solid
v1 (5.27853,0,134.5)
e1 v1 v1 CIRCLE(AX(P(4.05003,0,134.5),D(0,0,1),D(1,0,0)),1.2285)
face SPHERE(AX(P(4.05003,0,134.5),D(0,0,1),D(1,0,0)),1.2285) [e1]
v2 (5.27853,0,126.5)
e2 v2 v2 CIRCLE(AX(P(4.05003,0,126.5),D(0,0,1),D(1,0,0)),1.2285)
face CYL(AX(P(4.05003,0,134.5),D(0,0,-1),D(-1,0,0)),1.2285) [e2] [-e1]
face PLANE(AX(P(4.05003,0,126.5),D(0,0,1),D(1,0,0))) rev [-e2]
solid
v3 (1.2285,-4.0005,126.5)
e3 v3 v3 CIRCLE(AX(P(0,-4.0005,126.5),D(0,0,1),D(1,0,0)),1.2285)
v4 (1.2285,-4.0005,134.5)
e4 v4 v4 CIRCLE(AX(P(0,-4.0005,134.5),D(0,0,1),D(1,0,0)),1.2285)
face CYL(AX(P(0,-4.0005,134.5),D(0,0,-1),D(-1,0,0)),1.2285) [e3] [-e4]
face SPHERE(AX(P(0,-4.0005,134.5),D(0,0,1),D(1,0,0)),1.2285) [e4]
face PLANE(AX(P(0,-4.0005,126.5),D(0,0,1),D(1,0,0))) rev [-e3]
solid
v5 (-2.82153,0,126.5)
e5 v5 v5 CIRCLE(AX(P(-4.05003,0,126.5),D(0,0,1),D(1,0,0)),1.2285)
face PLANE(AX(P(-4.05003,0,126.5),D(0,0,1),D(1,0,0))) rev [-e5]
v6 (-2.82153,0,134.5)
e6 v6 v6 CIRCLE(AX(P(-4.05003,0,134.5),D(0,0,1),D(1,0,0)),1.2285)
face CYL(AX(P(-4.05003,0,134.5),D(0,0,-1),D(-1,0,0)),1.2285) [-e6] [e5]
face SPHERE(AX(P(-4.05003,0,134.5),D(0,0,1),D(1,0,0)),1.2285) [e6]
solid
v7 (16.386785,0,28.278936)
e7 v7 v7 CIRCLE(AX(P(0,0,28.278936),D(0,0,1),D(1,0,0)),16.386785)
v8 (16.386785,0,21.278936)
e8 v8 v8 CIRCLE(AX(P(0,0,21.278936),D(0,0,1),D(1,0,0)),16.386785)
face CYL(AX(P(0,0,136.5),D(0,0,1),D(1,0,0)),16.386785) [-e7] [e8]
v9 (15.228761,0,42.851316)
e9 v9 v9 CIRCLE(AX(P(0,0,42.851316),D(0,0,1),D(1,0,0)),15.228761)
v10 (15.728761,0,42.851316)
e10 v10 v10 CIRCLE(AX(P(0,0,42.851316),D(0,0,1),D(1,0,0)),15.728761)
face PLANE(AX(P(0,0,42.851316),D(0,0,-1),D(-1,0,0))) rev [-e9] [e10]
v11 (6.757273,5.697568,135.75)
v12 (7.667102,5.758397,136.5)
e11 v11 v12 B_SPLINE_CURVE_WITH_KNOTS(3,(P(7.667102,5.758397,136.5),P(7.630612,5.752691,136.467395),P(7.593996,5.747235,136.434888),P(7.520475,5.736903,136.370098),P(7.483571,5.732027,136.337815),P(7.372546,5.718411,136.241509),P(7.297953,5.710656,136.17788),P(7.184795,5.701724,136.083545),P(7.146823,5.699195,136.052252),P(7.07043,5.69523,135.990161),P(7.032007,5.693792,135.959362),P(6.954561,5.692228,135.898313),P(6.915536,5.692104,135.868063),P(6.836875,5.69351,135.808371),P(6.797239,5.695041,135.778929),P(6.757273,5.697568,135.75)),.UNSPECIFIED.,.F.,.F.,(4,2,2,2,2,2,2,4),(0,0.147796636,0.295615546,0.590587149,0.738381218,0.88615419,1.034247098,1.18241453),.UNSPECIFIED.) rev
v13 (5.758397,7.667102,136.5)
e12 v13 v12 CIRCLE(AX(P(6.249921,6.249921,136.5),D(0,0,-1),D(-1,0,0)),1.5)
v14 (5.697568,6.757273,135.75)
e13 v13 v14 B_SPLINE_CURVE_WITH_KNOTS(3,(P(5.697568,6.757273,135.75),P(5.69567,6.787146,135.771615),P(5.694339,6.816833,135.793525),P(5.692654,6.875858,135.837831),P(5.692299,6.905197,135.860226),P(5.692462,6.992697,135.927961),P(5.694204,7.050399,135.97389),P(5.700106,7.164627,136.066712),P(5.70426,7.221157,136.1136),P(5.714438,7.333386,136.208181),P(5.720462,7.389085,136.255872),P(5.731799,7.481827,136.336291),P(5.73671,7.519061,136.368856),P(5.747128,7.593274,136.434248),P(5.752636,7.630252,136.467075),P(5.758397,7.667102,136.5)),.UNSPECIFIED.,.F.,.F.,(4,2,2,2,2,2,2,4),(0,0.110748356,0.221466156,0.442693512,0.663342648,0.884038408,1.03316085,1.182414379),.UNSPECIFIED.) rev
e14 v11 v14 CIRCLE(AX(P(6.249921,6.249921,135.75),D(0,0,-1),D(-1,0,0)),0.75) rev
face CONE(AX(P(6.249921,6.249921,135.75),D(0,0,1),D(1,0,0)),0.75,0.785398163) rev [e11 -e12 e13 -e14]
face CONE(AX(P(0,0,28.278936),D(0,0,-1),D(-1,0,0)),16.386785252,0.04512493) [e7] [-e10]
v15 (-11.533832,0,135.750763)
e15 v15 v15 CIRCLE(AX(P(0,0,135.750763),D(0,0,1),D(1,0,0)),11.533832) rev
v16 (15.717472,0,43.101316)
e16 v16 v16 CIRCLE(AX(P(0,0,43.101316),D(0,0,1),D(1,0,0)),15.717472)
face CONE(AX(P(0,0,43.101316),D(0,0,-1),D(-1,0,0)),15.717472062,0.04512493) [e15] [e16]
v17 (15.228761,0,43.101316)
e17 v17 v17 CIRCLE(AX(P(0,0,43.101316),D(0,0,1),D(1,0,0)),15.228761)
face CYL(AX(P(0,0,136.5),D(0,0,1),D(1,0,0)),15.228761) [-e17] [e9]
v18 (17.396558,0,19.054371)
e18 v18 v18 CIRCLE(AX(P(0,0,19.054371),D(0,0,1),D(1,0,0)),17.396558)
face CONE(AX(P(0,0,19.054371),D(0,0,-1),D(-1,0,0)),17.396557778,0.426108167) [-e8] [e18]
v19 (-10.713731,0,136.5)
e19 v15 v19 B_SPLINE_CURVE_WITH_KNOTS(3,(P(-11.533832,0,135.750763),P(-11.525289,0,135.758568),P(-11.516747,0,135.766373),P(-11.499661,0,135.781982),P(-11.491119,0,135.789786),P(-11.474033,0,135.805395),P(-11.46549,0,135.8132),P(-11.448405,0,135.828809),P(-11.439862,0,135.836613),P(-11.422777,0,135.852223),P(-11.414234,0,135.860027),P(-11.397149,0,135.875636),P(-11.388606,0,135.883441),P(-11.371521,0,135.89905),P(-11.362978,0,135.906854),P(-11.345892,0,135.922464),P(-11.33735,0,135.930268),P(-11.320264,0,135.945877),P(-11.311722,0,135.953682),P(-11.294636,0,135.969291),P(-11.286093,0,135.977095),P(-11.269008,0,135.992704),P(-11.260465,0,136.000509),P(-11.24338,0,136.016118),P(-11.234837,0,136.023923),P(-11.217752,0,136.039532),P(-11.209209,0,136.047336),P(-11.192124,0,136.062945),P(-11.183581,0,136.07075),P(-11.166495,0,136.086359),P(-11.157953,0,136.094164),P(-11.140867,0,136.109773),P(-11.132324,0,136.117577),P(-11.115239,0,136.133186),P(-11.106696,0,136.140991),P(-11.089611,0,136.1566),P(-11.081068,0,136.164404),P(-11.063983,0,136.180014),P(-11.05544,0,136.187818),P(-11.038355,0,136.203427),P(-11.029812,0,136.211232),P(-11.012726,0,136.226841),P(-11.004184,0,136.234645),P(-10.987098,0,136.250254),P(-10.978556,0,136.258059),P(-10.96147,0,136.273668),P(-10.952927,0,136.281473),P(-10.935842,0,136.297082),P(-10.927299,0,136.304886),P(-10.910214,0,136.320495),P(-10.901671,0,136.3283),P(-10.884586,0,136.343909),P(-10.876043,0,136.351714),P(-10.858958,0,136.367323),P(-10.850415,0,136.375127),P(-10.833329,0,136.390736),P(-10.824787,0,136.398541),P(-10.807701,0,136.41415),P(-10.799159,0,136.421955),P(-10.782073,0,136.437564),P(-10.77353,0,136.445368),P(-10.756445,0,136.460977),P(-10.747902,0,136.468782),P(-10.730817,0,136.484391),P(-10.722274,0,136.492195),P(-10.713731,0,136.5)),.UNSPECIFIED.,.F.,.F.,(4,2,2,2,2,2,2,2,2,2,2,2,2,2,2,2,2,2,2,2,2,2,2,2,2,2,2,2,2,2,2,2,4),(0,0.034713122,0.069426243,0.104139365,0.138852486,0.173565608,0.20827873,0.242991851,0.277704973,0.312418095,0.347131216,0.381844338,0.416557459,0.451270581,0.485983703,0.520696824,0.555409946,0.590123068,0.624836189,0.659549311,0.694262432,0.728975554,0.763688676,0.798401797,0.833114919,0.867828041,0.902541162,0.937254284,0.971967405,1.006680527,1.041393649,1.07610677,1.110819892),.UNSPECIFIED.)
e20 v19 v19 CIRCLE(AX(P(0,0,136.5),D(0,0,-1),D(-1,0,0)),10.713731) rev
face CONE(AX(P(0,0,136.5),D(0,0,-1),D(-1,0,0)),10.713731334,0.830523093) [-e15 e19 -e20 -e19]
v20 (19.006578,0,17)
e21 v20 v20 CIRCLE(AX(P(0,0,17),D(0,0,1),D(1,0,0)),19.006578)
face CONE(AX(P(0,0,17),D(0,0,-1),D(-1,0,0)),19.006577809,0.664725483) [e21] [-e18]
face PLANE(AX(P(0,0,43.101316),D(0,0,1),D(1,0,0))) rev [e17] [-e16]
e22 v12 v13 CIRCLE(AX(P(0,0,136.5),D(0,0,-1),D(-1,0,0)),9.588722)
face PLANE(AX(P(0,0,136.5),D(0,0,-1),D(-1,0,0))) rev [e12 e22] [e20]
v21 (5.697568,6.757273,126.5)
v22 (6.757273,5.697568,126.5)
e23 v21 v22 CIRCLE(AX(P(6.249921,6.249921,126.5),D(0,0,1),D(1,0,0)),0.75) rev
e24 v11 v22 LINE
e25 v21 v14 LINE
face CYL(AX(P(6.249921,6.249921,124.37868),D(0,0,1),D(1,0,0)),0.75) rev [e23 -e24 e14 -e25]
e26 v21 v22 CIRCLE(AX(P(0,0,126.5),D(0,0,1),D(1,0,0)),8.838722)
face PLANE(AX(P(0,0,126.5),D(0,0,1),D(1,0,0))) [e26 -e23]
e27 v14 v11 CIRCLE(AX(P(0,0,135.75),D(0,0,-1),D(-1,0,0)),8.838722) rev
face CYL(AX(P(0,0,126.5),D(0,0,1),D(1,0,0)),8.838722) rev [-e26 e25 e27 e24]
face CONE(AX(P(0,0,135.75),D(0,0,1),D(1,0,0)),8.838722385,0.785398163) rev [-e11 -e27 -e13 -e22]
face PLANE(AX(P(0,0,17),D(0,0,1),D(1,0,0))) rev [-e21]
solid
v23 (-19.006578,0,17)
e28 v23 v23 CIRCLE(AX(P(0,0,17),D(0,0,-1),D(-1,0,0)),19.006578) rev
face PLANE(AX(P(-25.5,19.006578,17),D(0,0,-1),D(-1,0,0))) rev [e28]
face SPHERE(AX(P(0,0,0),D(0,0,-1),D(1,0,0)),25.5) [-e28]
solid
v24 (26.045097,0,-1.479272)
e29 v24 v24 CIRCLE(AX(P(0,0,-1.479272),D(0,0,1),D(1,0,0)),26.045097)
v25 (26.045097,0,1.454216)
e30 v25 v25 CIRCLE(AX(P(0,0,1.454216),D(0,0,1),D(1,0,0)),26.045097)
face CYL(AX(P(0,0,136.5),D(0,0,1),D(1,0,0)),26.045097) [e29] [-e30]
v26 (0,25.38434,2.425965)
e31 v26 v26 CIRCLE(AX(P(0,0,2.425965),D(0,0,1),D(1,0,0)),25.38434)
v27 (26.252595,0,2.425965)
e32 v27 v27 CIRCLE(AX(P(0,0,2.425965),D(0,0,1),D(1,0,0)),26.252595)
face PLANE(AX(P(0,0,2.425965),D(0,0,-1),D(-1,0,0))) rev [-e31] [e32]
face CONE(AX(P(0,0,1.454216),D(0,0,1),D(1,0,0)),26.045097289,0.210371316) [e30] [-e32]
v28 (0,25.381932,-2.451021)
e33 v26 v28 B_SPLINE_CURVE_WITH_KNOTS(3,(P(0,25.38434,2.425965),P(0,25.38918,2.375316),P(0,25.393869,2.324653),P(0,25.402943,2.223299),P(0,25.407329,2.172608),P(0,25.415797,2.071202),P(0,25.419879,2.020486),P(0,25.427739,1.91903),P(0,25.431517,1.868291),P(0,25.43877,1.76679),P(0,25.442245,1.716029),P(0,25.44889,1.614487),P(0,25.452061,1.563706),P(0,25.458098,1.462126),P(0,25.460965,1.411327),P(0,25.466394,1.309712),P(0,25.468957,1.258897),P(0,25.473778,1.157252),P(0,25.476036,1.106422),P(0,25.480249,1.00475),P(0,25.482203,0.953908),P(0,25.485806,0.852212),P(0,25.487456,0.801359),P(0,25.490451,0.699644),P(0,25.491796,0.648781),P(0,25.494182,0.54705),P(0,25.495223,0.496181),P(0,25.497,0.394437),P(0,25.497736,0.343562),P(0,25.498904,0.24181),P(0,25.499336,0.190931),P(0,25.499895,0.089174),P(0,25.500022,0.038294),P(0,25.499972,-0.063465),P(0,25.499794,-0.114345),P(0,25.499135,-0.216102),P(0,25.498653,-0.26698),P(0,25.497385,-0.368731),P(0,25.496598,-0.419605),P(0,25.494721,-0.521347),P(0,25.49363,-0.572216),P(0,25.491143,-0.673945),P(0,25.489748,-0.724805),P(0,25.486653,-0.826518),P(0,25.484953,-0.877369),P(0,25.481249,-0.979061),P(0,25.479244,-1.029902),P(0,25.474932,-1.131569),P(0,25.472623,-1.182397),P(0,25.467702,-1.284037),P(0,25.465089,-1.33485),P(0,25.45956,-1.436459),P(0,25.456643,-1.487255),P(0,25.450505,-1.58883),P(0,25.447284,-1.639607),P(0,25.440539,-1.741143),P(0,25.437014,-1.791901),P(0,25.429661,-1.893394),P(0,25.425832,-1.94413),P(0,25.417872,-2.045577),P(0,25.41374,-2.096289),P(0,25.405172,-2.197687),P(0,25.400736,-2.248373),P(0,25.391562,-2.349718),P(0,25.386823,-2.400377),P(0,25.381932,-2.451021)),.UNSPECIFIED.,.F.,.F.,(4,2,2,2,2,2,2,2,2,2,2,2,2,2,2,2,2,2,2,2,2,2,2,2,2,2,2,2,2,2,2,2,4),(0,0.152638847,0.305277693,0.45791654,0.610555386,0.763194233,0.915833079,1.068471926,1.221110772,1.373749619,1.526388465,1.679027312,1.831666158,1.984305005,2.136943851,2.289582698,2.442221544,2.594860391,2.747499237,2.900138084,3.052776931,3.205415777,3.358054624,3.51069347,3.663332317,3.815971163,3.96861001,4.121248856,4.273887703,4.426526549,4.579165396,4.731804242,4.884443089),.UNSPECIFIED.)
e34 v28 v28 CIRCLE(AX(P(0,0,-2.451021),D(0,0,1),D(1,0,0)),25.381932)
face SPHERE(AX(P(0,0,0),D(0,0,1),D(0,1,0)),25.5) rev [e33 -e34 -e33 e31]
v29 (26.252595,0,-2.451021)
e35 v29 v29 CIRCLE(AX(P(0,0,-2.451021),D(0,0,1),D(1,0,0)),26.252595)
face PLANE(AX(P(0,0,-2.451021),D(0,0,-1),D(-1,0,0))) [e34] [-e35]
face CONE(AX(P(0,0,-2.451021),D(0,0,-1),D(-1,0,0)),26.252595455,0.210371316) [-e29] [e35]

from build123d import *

# Parameters (mm, degrees)
CUT_EXTRUDE1_DEPTH      = 45.167295593
CUT_EXTRUDE1_DEPTH_BACK = 45.167295593
SKETCH4_R               = 8.838722385
CUT_EXTRUDE2_DEPTH      = 10
SKETCH5_R               = 1.2285
BOSS_EXTRUDE1_DEPTH     = 8
BOSS_EXTRUDE1_2_DEPTH   = 8
BOSS_EXTRUDE1_3_DEPTH   = 8
DOME1_FACE_RADIUS       = 1.2285
DOME1_HEIGHT            = 1.2285
DOME2_FACE_RADIUS       = 1.2285
DOME2_HEIGHT            = 1.2285
DOME3_FACE_RADIUS       = 1.2285
DOME3_HEIGHT            = 1.2285
SKETCH6_R               = 0.75
CUT_EXTRUDE4_DEPTH      = 10
CHAMFER1_SIZE           = 0.75
CHAMFER1_SIZE_2         = 0.786268666


with BuildPart() as part:
    # Sketch1 → Revolve2 (revolve)
    with BuildSketch(Plane(origin=(0, 0, 0), x_dir=(1, 0, 0), z_dir=(0, 1, 0))):
        with BuildLine():
            Line((0, 25.5), (0, -25.5))
            ThreePointArc((0, -25.5), (-25.5, 0), (0, 25.5))
        make_face()
    revolve(axis=Axis((0, 0, -25.5), (0, 0, 1)))

    # Sketch2 → Cut-Extrude1 (cut, two sides: drawn at the far end of the back side and taken through both)
    with BuildSketch(Plane(origin=(0, 0, 0), x_dir=(0, 0, -1), z_dir=(1, 0, 0)).offset(-CUT_EXTRUDE1_DEPTH_BACK)):
        with BuildLine():
            Line((-17, 19.006577809), (-17, -19.006577809))
            ThreePointArc((-17, -19.006577809), (-25.5, 0), (-17, 19.006577809))
        make_face()
    extrude(amount=CUT_EXTRUDE1_DEPTH + CUT_EXTRUDE1_DEPTH_BACK, mode=Mode.SUBTRACT)


with BuildPart() as body_2:
    # Sketch3 → Revolve4 (revolve)
    with BuildSketch(Plane(origin=(0, 0, 0), x_dir=(0, 0, -1), z_dir=(1, 0, 0)), mode=Mode.PRIVATE) as revolve4_sk:
        with BuildLine():
            Line((-25.5, 0), (-17, 0))
            Line((-17, 0), (-17, 19.006577809))
            ThreePointArc((-17, 19.006577809), (-23.278208694, 10.410331407), (-25.5, 0))
        make_face()
        with BuildLine():
            ThreePointArc((-25.5, 0), (-23.278208694, 10.410331407), (-17, 19.006577809))
            Line((-17, 19.006577809), (-19.054370862, 17.396557778))
            Line((-19.054370862, 17.396557778), (-21.278936425, 16.386785252))
            Line((-21.278936425, 16.386785252), (-28.278936425, 16.386785252))
            Line((-28.278936425, 16.386785252), (-42.85131589, 15.728760957))
            Line((-42.85131589, 15.728760957), (-42.85131589, 15.228760957))
            Line((-42.85131589, 15.228760957), (-43.10131589, 15.228760957))
            Line((-43.10131589, 15.228760957), (-43.10131589, 15.717472062))
            Line((-43.10131589, 15.717472062), (-136.5, 11.5))
            Line((-136.5, 11.5), (-136.5, 0))
            Line((-136.5, 0), (-25.5, 0))
        make_face()
        with BuildLine():
            ThreePointArc((2.451021145, 25.381932459), (0.012585798, 25.499996894), (-2.425964905, 25.384339548))
            Line((-2.425964905, 25.384339548), (-2.425964905, 26.252595455))
            Line((-2.425964905, 26.252595455), (-1.45421609, 26.045097289))
            Line((-1.45421609, 26.045097289), (1.479272331, 26.045097289))
            Line((1.479272331, 26.045097289), (2.451021145, 26.252595455))
            Line((2.451021145, 26.252595455), (2.451021145, 25.381932459))
        make_face()
    revolve(revolve4_sk.sketch.rotate(Axis((0, 0, 136.5), (0, 0, -1)), 90), axis=Axis((0, 0, 136.5), (0, 0, -1)))

    # Sketch4 → Cut-Extrude2 (cut)
    with BuildSketch(Plane.XY.offset(136.5)):
        Circle(SKETCH4_R)
    extrude(amount=-CUT_EXTRUDE2_DEPTH, mode=Mode.SUBTRACT)

    # Sketch6 → Cut-Extrude4 (cut)
    with BuildSketch(Plane.XY.offset(136.5)):
        with Locations((6.249920536, 6.249920536)):
            Circle(SKETCH6_R)
    extrude(amount=-CUT_EXTRUDE4_DEPTH, mode=Mode.SUBTRACT)

    # Chamfer1
    # the kernel refuses this chamfer: 0.786268666, 0.75 mm, written as the material it takes off along each edge
    with BuildSketch(Plane(origin=(0, 0, 136.5), x_dir=(0.7093247295722777, 0.7048818539423578, 0), z_dir=(-0.7048818539423578, 0.7093247295722777, 0))) as chamfer1_piece_1:
        Polygon((8.838722385 + CHAMFER1_SIZE, 0), (8.838722385, CHAMFER1_SIZE), (8.838722385, 0), align=None)
    revolve(axis=Axis((0, 0, 136.5), (0, 0, -1)), revolution_arc=359.64, mode=Mode.SUBTRACT)
    with BuildSketch(Plane(origin=(6.249920536, 6.249920536, 136.5), x_dir=(-0.7093247295722787, -0.7048818539423566, 0), z_dir=(0.7048818539423566, -0.7093247295722787, 0))) as chamfer1_piece_2:
        Polygon((0.75 + CHAMFER1_SIZE, 0), (0.75, CHAMFER1_SIZE), (0.75, 0), align=None)
    revolve(axis=Axis((6.249920536, 6.249920536, 136.5), (0, 0, -1)), revolution_arc=359.64, mode=Mode.SUBTRACT)
    with BuildSketch(Plane(origin=(0, 0, 136.5), x_dir=(1, 0, 0), z_dir=(0, 1, 0))) as chamfer1_piece_3:
        Polygon((11.5 + CHAMFER1_SIZE * 0.045109616875, CHAMFER1_SIZE * 0.998982043115), (11.5 - CHAMFER1_SIZE_2, 0), (11.5, 0), align=None)
    revolve(axis=Axis((0, 0, 136.5), (0, 0, -1)), mode=Mode.SUBTRACT)


with BuildPart() as body_3:
    # Sketch5 → Boss-Extrude1 (new body)
    with BuildSketch(Plane.XY.offset(126.5)):
        with Locations((-4.05003, 0)):
            Circle(SKETCH5_R)
    extrude(amount=BOSS_EXTRUDE1_DEPTH)

    # Dome1: a dome of height H over a round flat face of radius A is a cap of a sphere of radius (A * A + H * H) / (2 * H)
    dome1_r = (DOME1_FACE_RADIUS * DOME1_FACE_RADIUS + DOME1_HEIGHT * DOME1_HEIGHT) / (2 * DOME1_HEIGHT)
    dome1_base = Plane((-4.05003, 0, 134.5), z_dir=(0, 0, 1))
    with Locations(dome1_base.offset(DOME1_HEIGHT - dome1_r)):
        dome1_ball = Sphere(dome1_r, mode=Mode.PRIVATE)
    add(split(dome1_ball, bisect_by=dome1_base, keep=Keep.TOP, mode=Mode.PRIVATE))


with BuildPart() as body_4:
    # Sketch5 → Boss-Extrude1 2 (new body)
    with BuildSketch(Plane.XY.offset(126.5)):
        with Locations((4.05003, 0)):
            Circle(SKETCH5_R)
    extrude(amount=BOSS_EXTRUDE1_2_DEPTH)

    # Dome2: a dome of height H over a round flat face of radius A is a cap of a sphere of radius (A * A + H * H) / (2 * H)
    dome2_r = (DOME2_FACE_RADIUS * DOME2_FACE_RADIUS + DOME2_HEIGHT * DOME2_HEIGHT) / (2 * DOME2_HEIGHT)
    dome2_base = Plane((4.05003, 0, 134.5), z_dir=(0, 0, 1))
    with Locations(dome2_base.offset(DOME2_HEIGHT - dome2_r)):
        dome2_ball = Sphere(dome2_r, mode=Mode.PRIVATE)
    add(split(dome2_ball, bisect_by=dome2_base, keep=Keep.TOP, mode=Mode.PRIVATE))


with BuildPart() as body_5:
    # Sketch5 → Boss-Extrude1 3 (new body)
    with BuildSketch(Plane.XY.offset(126.5)):
        with Locations((0, -4.0005)):
            Circle(SKETCH5_R)
    extrude(amount=BOSS_EXTRUDE1_3_DEPTH)

    # Dome3: a dome of height H over a round flat face of radius A is a cap of a sphere of radius (A * A + H * H) / (2 * H)
    dome3_r = (DOME3_FACE_RADIUS * DOME3_FACE_RADIUS + DOME3_HEIGHT * DOME3_HEIGHT) / (2 * DOME3_HEIGHT)
    dome3_base = Plane((0, -4.0005, 134.5), z_dir=(0, 0, 1))
    with Locations(dome3_base.offset(DOME3_HEIGHT - dome3_r)):
        dome3_ball = Sphere(dome3_r, mode=Mode.PRIVATE)
    add(split(dome3_ball, bisect_by=dome3_base, keep=Keep.TOP, mode=Mode.PRIVATE))


solid = Compound([part.part, body_2.part, body_3.part, body_4.part, body_5.part])
